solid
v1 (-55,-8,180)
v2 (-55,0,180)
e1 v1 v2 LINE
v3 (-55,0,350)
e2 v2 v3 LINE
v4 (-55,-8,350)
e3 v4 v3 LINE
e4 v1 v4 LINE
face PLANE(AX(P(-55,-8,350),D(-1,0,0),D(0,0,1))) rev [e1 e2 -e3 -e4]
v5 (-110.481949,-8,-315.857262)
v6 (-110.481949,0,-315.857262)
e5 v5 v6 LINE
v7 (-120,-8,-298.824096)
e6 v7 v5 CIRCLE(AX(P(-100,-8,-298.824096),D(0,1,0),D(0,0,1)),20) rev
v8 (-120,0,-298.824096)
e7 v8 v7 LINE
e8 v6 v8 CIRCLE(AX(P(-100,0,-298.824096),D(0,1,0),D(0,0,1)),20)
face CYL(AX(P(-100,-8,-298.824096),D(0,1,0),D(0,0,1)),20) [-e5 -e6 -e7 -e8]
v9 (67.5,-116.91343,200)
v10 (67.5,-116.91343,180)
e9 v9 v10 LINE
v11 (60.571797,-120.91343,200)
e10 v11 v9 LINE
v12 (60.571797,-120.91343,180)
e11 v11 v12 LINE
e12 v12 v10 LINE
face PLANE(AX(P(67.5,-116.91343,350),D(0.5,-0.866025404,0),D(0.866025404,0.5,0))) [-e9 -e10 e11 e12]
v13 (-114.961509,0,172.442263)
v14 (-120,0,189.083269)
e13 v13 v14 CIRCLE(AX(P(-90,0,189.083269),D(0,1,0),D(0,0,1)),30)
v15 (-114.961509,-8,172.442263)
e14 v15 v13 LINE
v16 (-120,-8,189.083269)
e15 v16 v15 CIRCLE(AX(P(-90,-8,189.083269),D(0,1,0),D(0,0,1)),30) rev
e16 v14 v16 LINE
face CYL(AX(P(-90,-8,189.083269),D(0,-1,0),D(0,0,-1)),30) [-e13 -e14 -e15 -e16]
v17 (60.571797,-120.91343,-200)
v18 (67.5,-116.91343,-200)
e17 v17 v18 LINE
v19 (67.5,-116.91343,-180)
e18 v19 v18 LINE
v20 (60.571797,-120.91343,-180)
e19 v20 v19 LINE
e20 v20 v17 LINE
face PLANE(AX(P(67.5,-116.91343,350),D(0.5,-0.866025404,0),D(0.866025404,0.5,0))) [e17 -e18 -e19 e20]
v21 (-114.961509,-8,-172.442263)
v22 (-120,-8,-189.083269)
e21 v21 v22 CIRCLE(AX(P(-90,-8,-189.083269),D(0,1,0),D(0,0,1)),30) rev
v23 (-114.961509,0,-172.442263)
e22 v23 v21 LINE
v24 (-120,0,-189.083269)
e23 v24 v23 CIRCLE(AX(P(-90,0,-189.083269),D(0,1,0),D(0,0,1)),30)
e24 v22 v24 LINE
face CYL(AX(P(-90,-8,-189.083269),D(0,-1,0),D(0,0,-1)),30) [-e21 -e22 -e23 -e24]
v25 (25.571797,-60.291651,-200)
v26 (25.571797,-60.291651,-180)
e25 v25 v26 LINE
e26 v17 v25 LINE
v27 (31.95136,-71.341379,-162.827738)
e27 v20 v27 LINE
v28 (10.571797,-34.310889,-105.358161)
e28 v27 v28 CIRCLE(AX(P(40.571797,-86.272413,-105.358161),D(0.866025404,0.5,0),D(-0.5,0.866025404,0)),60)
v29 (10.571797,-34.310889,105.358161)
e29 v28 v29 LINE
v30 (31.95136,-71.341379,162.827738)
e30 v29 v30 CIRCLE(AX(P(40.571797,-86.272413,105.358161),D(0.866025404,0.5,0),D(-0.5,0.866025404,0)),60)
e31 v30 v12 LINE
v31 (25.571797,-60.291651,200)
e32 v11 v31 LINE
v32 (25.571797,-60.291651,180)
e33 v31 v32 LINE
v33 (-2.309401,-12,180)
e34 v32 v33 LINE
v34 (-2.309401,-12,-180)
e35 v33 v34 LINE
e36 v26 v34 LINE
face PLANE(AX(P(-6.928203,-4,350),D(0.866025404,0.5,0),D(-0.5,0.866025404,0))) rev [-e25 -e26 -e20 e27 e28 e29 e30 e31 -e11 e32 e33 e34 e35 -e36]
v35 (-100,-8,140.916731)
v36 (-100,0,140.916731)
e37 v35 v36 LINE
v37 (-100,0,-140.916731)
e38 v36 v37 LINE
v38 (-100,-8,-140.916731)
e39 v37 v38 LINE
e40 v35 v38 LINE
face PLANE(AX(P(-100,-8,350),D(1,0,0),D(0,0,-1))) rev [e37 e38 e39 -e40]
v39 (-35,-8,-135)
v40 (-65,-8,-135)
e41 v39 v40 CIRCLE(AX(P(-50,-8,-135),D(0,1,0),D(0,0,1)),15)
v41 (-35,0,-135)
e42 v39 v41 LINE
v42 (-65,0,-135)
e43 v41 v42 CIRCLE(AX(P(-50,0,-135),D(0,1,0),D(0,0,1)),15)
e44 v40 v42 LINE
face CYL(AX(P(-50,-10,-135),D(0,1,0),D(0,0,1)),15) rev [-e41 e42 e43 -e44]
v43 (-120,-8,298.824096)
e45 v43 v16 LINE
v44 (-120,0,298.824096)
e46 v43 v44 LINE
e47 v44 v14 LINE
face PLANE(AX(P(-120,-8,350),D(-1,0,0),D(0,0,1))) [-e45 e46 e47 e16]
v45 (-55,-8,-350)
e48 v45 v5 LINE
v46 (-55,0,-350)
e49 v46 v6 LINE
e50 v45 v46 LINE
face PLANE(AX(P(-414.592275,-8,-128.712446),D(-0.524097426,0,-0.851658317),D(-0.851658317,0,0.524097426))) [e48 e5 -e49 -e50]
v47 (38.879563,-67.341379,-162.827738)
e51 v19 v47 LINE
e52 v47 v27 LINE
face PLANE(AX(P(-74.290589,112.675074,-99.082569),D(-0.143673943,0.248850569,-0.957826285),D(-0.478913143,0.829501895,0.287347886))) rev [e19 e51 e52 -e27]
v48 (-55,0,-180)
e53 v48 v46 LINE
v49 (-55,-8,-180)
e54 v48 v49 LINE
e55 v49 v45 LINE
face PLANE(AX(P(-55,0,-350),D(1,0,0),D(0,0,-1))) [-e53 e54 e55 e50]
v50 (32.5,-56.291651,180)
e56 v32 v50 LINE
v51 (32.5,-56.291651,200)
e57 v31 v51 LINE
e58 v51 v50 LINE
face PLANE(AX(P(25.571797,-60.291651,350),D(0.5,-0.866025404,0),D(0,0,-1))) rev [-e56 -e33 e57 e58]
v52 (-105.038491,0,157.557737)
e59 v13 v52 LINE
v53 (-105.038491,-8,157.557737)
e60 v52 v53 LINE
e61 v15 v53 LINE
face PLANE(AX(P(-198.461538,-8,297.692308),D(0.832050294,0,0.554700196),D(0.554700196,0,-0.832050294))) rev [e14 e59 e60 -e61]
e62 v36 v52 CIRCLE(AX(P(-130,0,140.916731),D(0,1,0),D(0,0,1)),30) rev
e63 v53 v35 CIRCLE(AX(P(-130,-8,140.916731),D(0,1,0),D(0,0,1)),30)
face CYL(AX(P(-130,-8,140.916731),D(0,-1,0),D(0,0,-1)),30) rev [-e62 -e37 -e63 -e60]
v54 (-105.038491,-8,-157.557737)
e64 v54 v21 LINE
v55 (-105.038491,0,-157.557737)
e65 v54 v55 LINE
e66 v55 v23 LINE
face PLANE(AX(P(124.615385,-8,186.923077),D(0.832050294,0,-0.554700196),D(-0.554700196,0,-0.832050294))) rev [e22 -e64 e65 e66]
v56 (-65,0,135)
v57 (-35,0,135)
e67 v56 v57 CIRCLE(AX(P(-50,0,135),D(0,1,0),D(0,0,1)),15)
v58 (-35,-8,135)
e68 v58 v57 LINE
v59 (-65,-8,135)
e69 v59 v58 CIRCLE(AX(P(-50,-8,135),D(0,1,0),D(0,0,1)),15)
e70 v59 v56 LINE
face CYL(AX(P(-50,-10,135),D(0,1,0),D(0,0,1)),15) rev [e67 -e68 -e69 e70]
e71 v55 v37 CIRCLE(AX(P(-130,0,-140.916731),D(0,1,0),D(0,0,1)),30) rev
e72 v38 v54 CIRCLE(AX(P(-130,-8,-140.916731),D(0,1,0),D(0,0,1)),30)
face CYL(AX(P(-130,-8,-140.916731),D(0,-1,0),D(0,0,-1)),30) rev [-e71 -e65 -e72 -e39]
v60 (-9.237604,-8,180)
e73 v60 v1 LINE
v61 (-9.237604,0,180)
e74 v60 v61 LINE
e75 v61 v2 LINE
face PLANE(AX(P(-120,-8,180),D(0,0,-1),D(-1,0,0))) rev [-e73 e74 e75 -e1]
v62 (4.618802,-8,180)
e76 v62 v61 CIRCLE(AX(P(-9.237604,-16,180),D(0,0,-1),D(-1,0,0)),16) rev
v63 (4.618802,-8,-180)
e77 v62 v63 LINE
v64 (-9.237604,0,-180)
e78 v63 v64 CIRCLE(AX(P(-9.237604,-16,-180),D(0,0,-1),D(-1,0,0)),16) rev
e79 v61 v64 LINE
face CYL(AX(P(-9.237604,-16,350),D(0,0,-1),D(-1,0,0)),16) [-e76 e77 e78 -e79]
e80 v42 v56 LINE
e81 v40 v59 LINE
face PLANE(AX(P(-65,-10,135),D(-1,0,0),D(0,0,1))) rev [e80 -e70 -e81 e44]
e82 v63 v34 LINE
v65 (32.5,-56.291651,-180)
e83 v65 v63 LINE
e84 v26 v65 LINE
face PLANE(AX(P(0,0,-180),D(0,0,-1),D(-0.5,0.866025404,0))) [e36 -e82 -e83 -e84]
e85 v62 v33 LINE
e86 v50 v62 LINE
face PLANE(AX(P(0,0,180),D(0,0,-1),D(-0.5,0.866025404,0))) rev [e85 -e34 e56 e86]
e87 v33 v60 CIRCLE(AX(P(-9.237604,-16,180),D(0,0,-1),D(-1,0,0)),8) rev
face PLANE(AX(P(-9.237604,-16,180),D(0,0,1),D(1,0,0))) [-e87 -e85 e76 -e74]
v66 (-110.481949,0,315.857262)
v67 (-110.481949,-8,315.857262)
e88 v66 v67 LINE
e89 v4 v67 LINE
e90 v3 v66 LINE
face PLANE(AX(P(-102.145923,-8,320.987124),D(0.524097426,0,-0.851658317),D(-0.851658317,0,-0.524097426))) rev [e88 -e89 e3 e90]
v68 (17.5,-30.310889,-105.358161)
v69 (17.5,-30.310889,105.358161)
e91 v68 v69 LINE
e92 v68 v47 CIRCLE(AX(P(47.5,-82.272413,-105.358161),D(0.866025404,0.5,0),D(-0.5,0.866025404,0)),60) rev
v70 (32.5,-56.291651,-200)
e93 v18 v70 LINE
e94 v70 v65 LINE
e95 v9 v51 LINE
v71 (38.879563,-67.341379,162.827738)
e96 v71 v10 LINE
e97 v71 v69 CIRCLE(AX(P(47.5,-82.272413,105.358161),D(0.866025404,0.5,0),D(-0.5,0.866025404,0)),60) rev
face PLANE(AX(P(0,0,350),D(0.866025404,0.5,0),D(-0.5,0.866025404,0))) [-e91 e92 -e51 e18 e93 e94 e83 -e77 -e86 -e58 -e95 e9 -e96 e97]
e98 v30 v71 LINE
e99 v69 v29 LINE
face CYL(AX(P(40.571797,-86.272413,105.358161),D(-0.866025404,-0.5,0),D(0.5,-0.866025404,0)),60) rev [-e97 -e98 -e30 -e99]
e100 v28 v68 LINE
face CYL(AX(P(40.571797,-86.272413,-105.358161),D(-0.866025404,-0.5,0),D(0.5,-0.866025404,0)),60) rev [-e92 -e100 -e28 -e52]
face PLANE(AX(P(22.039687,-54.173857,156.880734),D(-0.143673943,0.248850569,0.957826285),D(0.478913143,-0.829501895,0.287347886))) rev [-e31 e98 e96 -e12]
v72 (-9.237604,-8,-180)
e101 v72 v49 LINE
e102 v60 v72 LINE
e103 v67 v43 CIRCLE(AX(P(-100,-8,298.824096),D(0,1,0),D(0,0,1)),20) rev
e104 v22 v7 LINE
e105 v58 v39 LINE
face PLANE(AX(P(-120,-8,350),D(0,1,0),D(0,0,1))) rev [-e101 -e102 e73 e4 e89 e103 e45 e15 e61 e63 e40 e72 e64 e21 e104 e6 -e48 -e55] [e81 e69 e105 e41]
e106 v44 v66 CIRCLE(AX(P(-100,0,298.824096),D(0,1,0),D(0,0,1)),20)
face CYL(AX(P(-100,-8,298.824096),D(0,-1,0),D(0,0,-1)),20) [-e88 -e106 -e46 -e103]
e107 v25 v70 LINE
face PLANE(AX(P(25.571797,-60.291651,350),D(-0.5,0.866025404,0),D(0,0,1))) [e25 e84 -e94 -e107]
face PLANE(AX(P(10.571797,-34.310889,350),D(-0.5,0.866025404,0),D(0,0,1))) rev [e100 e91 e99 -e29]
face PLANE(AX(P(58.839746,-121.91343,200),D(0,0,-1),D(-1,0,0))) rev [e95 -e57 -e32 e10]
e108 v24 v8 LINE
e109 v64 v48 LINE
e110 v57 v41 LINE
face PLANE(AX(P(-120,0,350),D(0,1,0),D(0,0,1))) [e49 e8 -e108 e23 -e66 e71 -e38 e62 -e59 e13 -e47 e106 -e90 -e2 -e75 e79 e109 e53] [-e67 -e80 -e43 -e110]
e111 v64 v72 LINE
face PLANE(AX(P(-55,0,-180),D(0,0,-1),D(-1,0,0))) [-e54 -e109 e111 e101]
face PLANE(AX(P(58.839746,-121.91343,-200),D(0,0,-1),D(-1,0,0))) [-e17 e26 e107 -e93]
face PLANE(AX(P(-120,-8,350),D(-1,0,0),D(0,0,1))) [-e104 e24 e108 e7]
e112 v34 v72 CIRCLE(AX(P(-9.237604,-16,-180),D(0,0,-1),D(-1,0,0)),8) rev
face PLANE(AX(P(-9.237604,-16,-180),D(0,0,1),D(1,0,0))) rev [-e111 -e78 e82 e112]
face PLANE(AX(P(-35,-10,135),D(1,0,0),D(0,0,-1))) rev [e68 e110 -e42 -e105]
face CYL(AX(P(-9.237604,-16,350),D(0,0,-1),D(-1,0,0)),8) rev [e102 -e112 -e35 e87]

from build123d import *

# Parameters (mm, degrees)
SM_BASE_FLANGE_1_DEPTH = 350
CUT_EXTRUDE_1_DEPTH    = 10
CUT_EXTRUDE_2_DEPTH    = 10
CUT_EXTRUDE_START      = 180
CUT_EXTRUDE_3_DEPTH    = 170
CUT_EXTRUDE_4_DEPTH    = 10
SKETCH_10_W            = 150
SKETCH_10_H            = 123.452994616
CUT_EXTRUDE_5_DEPTH    = 10
SKETCH_11_W            = 20
SKETCH_11_H            = 53.452994616
CUT_EXTRUDE_6_DEPTH    = 10
CUT_EXTRUDE_7_DEPTH    = 10
FILLET_1_R             = 60
FILLET_2_R             = 30
FILLET_3_R             = 20


# Read off the part's stored shape, not the designer's step: 切除-拉伸3
# Sheet-metal steps are written as plain solids
with BuildPart() as part:
    # Sketch 1 → 基体-法兰1 (new, symmetric)
    with BuildSketch(Plane.XY):
        with BuildLine():
            Line((-120, 0), (-9.237604307, 0))
            ThreePointArc((-9.237604307, 0), (-1.237604307, -2.143593539), (4.618802154, -8))
            Line((4.618802154, -8), (67.5, -116.913429511))
            Line((67.5, -116.913429511), (60.57179677, -120.913429511))
            Line((60.57179677, -120.913429511), (-2.309401077, -12))
            ThreePointArc((-2.309401077, -12), (-5.237604307, -9.07179677), (-9.237604307, -8))
            Line((-9.237604307, -8), (-120, -8))
            Line((-120, -8), (-120, 0))
        make_face()
    extrude(amount=SM_BASE_FLANGE_1_DEPTH, both=True)

    # 草图6 → 切除-拉伸1 (cut)
    with BuildSketch(Plane(origin=(0, 0, 0), x_dir=(1, 0, 0), z_dir=(0, 1, 0))):
        Polygon((-120, -180), (-120, 180), (-100, 150), (-100, -150), align=None)
    extrude(amount=-CUT_EXTRUDE_1_DEPTH, mode=Mode.SUBTRACT)

    # 草图7 → 切除-拉伸2 (cut)
    with BuildSketch(Plane(origin=(0, 0, 0), x_dir=(1, 0, 0), z_dir=(0, 1, 0))):
        with BuildLine():
            Line((-65, -135), (-65, 135))
            ThreePointArc((-65, 135), (-50, 150), (-35, 135))
            Line((-35, 135), (-35, -135))
            ThreePointArc((-35, -135), (-50, -150), (-65, -135))
        make_face()
    extrude(amount=-CUT_EXTRUDE_2_DEPTH, mode=Mode.SUBTRACT)

    # 切除-拉伸3 outline → 切除-拉伸3 (cut)
    with BuildSketch(Plane.XY.offset(CUT_EXTRUDE_START)):
        with BuildLine():
            Line((-2.309401077, -12), (-1.154700538, -14))
            Line((-1.154700538, -14), (5.773502692, -10))
            Line((5.773502692, -10), (4.618802154, -8))
            ThreePointArc((4.618802154, -8), (-1.237604307, -2.143593539), (-9.237604307, 0))
            Line((-9.237604307, 0), (-55, 0))
            Line((-55, 0), (-55, -8))
            Line((-55, -8), (-9.237604307, -8))
            ThreePointArc((-9.237604307, -8), (-5.237604307, -9.07179677), (-2.309401077, -12))
        make_face()
    cut_extrude_3 = extrude(amount=CUT_EXTRUDE_3_DEPTH, mode=Mode.SUBTRACT)

    # 草图9 → 切除-拉伸4 (cut)
    with BuildSketch(Plane(origin=(0, 0, 0), x_dir=(1, 0, 0), z_dir=(0, 1, 0))):
        Polygon((-120, -350), (-120, -310), (-55, -350), align=None)
    cut_extrude_4 = extrude(amount=-CUT_EXTRUDE_4_DEPTH, mode=Mode.SUBTRACT)

    # 草图10 → 切除-拉伸5 (cut)
    with BuildSketch(Plane(origin=(0, 0, 0), x_dir=(0, 0, -1), z_dir=(0.8660254037844398, 0.49999999999999806, 0))):
        with Locations((-275, -73.273502692)):
            Rectangle(SKETCH_10_W, SKETCH_10_H)
    cut_extrude_5 = extrude(amount=-CUT_EXTRUDE_5_DEPTH, mode=Mode.SUBTRACT)

    # 草图11 → 切除-拉伸6 (cut)
    with BuildSketch(Plane(origin=(0, 0, 0), x_dir=(0, 0, -1), z_dir=(0.8660254037844398, 0.49999999999999806, 0))):
        with Locations((-190, -38.273502692)):
            Rectangle(SKETCH_11_W, SKETCH_11_H)
    cut_extrude_6 = extrude(amount=-CUT_EXTRUDE_6_DEPTH, mode=Mode.SUBTRACT)

    # 镜向1: 切除-拉伸4, 切除-拉伸5 across plane
    add(cut_extrude_4.mirror(Plane.XY), mode=Mode.SUBTRACT)
    add(cut_extrude_5.mirror(Plane.XY), mode=Mode.SUBTRACT)

    # 镜向2: 切除-拉伸3 across plane
    add(cut_extrude_3.mirror(Plane.XY), mode=Mode.SUBTRACT)

    # 镜向3: 切除-拉伸6 across plane
    add(cut_extrude_6.mirror(Plane.XY), mode=Mode.SUBTRACT)

    # 草图12 → 切除-拉伸7 (cut)
    with BuildSketch(Plane(origin=(0, 0, 0), x_dir=(0, 0, -1), z_dir=(0.8660254037844398, 0.49999999999999806, 0))):
        Polygon((-150, -35), (150, -35), (180, -135), (-180, -135), align=None)
    extrude(amount=-CUT_EXTRUDE_7_DEPTH, mode=Mode.SUBTRACT)

    # 圆角1
    fillet_1_edges = [part.edges().sort_by_distance(p)[0] for p in [
        (14.035898385, -32.310889132, 150),
        (14.035898385, -32.310889132, -150),
    ]]
    fillet(fillet_1_edges, radius=FILLET_1_R)

    # 圆角2
    fillet_2_edges = [part.edges().sort_by_distance(p)[0] for p in [
        (-120, -4, -180),
        (-100, -4, -150),
        (-100, -4, 150),
        (-120, -4, 180),
    ]]
    fillet(fillet_2_edges, radius=FILLET_2_R)

    # 圆角3
    fillet_3_edges = [part.edges().sort_by_distance(p)[0] for p in [
        (-120, -4, 310),
        (-120, -4, -310),
    ]]
    fillet(fillet_3_edges, radius=FILLET_3_R)


solid = part.part
